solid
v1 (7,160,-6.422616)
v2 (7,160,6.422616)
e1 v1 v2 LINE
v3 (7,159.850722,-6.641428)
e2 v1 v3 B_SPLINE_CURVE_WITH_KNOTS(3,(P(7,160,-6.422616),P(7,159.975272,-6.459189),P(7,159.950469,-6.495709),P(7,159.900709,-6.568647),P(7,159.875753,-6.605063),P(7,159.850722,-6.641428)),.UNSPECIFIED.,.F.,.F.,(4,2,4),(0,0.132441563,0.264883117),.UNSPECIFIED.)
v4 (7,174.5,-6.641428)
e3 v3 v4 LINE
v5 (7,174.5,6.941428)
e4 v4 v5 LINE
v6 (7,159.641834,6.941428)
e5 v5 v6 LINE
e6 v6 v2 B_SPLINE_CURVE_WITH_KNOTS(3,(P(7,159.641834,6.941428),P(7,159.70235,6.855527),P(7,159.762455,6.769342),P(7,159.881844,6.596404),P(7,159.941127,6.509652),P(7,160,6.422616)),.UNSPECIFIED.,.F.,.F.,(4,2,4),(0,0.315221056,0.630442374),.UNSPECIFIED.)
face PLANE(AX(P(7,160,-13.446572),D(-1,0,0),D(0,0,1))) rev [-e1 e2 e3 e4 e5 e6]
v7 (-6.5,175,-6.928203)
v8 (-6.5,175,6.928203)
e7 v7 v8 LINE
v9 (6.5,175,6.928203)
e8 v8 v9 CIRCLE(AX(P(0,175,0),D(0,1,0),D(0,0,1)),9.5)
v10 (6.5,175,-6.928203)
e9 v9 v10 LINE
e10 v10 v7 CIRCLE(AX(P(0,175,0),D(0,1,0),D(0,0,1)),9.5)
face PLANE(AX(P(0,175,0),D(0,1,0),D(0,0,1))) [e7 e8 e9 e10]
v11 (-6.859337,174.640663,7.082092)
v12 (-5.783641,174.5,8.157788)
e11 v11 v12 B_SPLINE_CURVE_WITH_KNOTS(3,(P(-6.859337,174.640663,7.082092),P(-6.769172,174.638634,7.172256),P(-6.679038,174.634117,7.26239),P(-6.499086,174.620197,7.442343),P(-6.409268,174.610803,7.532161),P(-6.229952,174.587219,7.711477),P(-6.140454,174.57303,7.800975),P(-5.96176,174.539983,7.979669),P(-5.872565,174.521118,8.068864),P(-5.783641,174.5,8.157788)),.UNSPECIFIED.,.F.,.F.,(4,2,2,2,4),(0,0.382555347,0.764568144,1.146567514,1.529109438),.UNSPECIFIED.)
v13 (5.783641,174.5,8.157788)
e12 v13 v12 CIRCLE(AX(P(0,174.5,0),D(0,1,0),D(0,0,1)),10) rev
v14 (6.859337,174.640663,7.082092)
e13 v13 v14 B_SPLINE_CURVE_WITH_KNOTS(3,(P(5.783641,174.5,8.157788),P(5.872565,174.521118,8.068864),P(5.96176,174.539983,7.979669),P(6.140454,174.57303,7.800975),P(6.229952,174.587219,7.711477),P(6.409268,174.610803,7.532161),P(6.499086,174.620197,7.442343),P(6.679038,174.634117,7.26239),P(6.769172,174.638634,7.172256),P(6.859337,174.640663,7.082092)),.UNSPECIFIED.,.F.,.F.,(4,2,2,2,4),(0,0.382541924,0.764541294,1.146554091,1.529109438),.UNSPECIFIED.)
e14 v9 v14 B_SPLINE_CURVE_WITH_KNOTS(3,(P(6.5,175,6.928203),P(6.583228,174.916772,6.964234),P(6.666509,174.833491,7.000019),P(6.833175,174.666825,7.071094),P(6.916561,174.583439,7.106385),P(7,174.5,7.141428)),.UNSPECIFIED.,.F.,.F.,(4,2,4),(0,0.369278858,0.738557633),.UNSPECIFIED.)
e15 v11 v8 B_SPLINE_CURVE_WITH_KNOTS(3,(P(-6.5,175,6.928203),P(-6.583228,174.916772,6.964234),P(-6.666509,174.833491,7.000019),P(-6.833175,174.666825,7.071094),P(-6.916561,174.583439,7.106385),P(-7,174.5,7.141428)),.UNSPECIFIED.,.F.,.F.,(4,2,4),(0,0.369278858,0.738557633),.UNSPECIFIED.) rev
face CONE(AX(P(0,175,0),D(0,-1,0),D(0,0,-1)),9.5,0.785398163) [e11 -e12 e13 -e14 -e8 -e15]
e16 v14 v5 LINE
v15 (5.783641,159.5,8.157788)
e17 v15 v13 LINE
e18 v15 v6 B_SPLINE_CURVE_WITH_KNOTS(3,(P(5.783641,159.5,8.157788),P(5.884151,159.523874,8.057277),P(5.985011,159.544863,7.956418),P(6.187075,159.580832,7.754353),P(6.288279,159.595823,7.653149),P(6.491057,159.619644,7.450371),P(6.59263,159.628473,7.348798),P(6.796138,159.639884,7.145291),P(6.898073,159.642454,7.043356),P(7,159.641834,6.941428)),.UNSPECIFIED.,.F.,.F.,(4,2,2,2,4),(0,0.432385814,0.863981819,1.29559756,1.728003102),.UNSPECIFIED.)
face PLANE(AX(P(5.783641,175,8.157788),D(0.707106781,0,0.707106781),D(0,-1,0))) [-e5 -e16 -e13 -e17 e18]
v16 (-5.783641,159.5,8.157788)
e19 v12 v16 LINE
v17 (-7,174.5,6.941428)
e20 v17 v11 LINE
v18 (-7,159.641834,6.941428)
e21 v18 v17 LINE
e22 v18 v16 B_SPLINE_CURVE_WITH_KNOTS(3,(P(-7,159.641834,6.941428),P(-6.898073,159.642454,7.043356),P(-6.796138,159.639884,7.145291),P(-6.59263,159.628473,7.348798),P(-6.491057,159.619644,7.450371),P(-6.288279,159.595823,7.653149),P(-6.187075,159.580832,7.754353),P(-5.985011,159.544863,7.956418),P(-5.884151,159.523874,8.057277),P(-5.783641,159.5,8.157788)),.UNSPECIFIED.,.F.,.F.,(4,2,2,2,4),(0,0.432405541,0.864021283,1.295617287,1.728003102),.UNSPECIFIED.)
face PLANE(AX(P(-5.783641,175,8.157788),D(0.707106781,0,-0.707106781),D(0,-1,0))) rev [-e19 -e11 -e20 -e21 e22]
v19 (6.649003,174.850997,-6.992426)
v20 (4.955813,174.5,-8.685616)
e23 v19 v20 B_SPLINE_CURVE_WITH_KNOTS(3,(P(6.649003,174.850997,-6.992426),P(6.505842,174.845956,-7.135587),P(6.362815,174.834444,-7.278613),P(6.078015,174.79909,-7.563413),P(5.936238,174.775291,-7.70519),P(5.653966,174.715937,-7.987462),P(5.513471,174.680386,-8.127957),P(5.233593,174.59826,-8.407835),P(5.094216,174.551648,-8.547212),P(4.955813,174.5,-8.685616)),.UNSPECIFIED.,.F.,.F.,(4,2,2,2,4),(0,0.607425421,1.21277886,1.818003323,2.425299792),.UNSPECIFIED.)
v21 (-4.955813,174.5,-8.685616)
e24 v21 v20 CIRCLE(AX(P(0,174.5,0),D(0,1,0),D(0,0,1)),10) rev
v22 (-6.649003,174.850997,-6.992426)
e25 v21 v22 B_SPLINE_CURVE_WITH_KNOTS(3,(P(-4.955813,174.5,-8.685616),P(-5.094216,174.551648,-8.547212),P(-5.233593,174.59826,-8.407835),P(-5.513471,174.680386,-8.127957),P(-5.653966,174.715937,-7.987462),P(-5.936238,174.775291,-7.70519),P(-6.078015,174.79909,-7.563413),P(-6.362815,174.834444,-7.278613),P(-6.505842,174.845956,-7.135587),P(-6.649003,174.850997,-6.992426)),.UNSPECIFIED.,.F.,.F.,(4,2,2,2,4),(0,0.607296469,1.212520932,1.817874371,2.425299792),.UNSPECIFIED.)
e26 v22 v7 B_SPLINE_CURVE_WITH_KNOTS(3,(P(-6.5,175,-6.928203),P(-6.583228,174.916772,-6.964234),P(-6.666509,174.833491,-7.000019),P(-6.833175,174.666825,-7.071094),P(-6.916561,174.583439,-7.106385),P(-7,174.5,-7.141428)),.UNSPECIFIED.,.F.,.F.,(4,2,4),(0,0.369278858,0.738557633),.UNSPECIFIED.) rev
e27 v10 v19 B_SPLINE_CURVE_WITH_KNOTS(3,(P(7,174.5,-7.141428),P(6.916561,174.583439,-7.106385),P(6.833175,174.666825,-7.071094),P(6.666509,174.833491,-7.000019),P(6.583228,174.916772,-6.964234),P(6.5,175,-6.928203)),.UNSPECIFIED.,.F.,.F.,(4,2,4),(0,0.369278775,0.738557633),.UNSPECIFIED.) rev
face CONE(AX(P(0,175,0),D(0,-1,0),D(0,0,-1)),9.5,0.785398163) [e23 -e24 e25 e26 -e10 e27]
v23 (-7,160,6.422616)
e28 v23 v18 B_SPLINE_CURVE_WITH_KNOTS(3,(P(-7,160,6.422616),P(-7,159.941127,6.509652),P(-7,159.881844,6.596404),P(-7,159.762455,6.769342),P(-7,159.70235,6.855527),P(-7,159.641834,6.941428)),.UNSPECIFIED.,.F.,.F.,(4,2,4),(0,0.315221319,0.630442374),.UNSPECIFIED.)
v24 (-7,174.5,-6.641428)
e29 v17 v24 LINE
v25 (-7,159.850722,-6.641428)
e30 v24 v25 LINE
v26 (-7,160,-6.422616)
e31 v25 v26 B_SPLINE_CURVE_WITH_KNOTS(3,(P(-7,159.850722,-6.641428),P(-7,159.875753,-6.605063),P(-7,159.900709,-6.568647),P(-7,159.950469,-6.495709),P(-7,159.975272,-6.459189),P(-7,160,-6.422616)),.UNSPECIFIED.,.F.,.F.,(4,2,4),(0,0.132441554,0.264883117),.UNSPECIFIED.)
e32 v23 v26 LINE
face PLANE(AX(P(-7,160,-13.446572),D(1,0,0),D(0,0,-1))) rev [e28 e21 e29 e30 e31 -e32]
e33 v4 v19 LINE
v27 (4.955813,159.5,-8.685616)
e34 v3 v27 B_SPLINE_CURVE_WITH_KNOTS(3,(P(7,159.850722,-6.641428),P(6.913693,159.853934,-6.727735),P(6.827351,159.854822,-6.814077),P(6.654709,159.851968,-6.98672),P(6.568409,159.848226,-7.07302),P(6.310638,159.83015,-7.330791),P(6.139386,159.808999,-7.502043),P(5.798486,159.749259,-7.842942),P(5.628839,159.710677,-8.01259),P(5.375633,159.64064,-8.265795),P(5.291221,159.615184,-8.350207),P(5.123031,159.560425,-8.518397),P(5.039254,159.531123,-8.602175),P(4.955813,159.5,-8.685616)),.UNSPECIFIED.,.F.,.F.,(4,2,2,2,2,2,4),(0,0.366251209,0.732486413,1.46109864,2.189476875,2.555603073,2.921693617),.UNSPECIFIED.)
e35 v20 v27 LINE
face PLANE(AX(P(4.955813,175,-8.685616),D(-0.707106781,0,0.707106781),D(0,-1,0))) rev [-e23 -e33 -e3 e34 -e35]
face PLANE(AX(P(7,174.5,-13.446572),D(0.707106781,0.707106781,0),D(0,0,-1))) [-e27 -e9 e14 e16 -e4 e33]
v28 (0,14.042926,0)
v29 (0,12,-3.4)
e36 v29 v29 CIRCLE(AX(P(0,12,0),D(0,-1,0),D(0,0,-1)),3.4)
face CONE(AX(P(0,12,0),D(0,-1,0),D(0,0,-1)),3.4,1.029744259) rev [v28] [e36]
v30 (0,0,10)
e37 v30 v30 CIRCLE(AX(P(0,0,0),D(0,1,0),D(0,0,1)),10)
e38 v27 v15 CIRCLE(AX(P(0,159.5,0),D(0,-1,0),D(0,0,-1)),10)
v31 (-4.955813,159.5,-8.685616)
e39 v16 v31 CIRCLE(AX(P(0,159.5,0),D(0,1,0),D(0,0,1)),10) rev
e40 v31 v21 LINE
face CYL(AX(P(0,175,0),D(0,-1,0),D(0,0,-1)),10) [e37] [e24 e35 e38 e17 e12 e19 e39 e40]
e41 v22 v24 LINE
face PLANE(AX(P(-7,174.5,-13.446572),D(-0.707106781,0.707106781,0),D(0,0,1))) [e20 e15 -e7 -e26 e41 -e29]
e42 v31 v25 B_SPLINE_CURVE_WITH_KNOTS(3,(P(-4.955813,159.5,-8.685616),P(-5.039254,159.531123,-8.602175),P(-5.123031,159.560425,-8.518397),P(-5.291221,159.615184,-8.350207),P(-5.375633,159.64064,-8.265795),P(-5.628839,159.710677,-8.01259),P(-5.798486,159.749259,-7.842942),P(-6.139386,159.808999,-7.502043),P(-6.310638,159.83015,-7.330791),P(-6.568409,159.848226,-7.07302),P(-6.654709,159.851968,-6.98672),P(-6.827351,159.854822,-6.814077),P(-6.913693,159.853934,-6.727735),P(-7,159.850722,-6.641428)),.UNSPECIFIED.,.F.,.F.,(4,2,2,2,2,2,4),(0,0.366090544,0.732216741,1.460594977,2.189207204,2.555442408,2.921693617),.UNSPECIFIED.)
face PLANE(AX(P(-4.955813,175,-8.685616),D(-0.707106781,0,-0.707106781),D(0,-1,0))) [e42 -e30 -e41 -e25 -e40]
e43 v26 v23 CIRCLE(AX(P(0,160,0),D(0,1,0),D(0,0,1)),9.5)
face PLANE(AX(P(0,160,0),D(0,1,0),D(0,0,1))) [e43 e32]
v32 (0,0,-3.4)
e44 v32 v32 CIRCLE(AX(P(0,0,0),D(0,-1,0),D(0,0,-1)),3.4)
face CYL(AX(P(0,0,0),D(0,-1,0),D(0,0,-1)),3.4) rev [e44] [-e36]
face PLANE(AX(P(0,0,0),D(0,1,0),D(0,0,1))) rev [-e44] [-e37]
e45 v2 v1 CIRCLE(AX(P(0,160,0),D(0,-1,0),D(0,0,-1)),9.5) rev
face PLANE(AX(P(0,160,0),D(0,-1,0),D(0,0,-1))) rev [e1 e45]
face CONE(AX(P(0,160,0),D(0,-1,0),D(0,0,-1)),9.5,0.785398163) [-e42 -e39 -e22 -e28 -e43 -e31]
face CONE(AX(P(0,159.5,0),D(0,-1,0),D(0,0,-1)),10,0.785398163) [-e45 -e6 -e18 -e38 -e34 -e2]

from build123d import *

# Parameters (mm, degrees)
SKETCH_1_R             = 10
EXTRUDE_1_DEPTH        = 175
SKETCH_2_W             = 7.534980856
SKETCH_2_H             = 25.851722938
CUT_EXTRUDE_1_DEPTH    = 15
HOLE_WIZARD_M8_1_D     = 6.8
HOLE_WIZARD_M8_1_DEPTH = 12
HOLE_WIZARD_M8_1_TIP   = 2.042926105
CHAMFER_1_SIZE         = 0.5
CHAMFER_4_SIZE         = 0.2
CHAMFER_5_SIZE         = 0.5
CHAMFER_2_SIZE         = 0.5


with BuildPart() as part:
    # 스케치1 → 보스-돌출1 (new body)
    with BuildSketch(Plane(origin=(0, 0, 0), x_dir=(1, 0, 0), z_dir=(0, 1, 0))):
        with Locations(Location((0, 0, 0), (0, 0, 270))):
            Circle(SKETCH_1_R)
    extrude(amount=EXTRUDE_1_DEPTH)

    # 스케치2 → 컷-돌출1 (cut)
    with BuildSketch(Plane(origin=(0, 175, 0), x_dir=(1, 0, 0), z_dir=(0, 1, 0))):
        with Locations((-10.767490428, 0.520710059)):
            Rectangle(SKETCH_2_W, SKETCH_2_H)
        with Locations((10.767490428, 0.520710059)):
            Rectangle(SKETCH_2_W, SKETCH_2_H)
    extrude(amount=-CUT_EXTRUDE_1_DEPTH, mode=Mode.SUBTRACT)

    # M8 나사 구멍1
    with Locations(Plane(origin=(0, 0, 0), x_dir=(-1, 0, 0), z_dir=(0, -1, 0))):
        with Locations((0, 0)):
            Hole(HOLE_WIZARD_M8_1_D / 2, depth=HOLE_WIZARD_M8_1_DEPTH)
            with Locations((0, 0, -(HOLE_WIZARD_M8_1_DEPTH + HOLE_WIZARD_M8_1_TIP / 2))):  # 118° drill point
                Cone(0, HOLE_WIZARD_M8_1_D / 2, HOLE_WIZARD_M8_1_TIP, mode=Mode.SUBTRACT)

    # 모따기1
    chamfer_1_edges = [part.edges().sort_by_distance(p)[0] for p in [
        (0, 175, -10),
        (3.780589618, 175, 9.257815193),
        (7, 175, 0),
        (-7, 175, 0),
    ]]
    chamfer(chamfer_1_edges, length=CHAMFER_1_SIZE)

    # 모따기4
    # the kernel refuses this chamfer: 14.141428429, 0.2 mm, written as the material it takes off along each edge
    with BuildSketch(Plane(origin=(-7, 179.872714198, 7.141428429), x_dir=(0.7673746516372044, 0, 0.6411989894133326), z_dir=(0, -1, 0))) as chamfer_4_piece_1:
        with BuildLine():
            Line((1.58509174, 0), (-CHAMFER_4_SIZE * 0.641198989413, -CHAMFER_4_SIZE * 0.767374651637))
            Line((-CHAMFER_4_SIZE * 0.641198989413, -CHAMFER_4_SIZE * 0.767374651637), (0, 0))
            ThreePointArc((0, 0), (1.074309981, 0.027485583), (1.58509174, 0))
        make_face()
    extrude(amount=19.872714198, mode=Mode.SUBTRACT)
    with BuildSketch(Plane(origin=(7, 179.872714198, 7.141428429), x_dir=(-0.7673746516372026, 0, 0.6411989894133348), z_dir=(0, -1, 0))) as chamfer_4_piece_2:
        with BuildLine():
            Line((1.58509174, 0), (-CHAMFER_4_SIZE * 0.641198989413, CHAMFER_4_SIZE * 0.767374651637))
            Line((-CHAMFER_4_SIZE * 0.641198989413, CHAMFER_4_SIZE * 0.767374651637), (0, 0))
            ThreePointArc((0, 0), (1.074309981, -0.027485583), (1.58509174, 0))
        make_face()
    extrude(amount=19.872714198, mode=Mode.SUBTRACT)

    # 모따기5
    # the kernel refuses this chamfer: 35.353571071, 0.5 mm, written as the material it takes off along each edge
    with BuildSketch(Plane(origin=(7, 184.418230147, -7.141428429), x_dir=(-0.7979254789483874, 0, -0.6027561115782952), z_dir=(0, -1, 0))) as chamfer_5_piece_1:
        with BuildLine():
            Line((2.561877444, 0), (-CHAMFER_5_SIZE * 0.602756111578, -CHAMFER_5_SIZE * 0.797925478948))
            Line((-CHAMFER_5_SIZE * 0.602756111578, -CHAMFER_5_SIZE * 0.797925478948), (0, 0))
            ThreePointArc((0, 0), (1.978478429, 0.058021773), (2.561877444, 0))
        make_face()
    extrude(amount=24.418230147, mode=Mode.SUBTRACT)
    with BuildSketch(Plane(origin=(-7, 184.418230147, -7.141428429), x_dir=(0.797925478948387, 0, -0.6027561115782961), z_dir=(0, -1, 0))) as chamfer_5_piece_2:
        with BuildLine():
            Line((2.561877444, 0), (-CHAMFER_5_SIZE * 0.602756111578, CHAMFER_5_SIZE * 0.797925478948))
            Line((-CHAMFER_5_SIZE * 0.602756111578, CHAMFER_5_SIZE * 0.797925478948), (0, 0))
            ThreePointArc((0, 0), (1.978478429, -0.058021773), (2.561877444, 0))
        make_face()
    extrude(amount=24.418230147, mode=Mode.SUBTRACT)

    # 모따기2
    # the kernel refuses this chamfer: 0.5 mm, written as the material it takes off along each edge
    with BuildSketch(Plane(origin=(0, 160, 0), x_dir=(-0.6999999999999962, 0, 0.7141428428542888), z_dir=(0.7141428428542888, 0, 0.6999999999999962))) as chamfer_2_piece_1_section:
        Polygon((10, CHAMFER_2_SIZE), (10 - CHAMFER_2_SIZE, 0), (10, 0), align=None)
    chamfer_2_piece_1 = revolve(axis=Axis((0, 160, 0), (0, -1, 0)), revolution_arc=113.236333046, mode=Mode.PRIVATE)
    chamfer_2_piece_1 = split(chamfer_2_piece_1, bisect_by=Plane(origin=(-7, 160, 0), z_dir=(-1, 0, 0)), keep=Keep.TOP, mode=Mode.PRIVATE)
    add(chamfer_2_piece_1, mode=Mode.SUBTRACT)
    with BuildSketch(Plane(origin=(0, 160, 0), x_dir=(-0.6999999999999962, 0, 0.7141428428542888), z_dir=(0.7141428428542888, 0, 0.6999999999999962))) as chamfer_2_piece_2_section:
        Polygon((10, CHAMFER_2_SIZE), (10 - CHAMFER_2_SIZE, 0), (10, 0), align=None)
    chamfer_2_piece_2 = revolve(axis=Axis((0, 160, 0), (0, -1, 0)), revolution_arc=113.236333046, mode=Mode.PRIVATE)
    chamfer_2_piece_2 = split(chamfer_2_piece_2, bisect_by=Plane(origin=(-6.970714214, 160, 6.970714214), z_dir=(-0.7071067811840911, 0, 0.707106781189004)), keep=Keep.TOP, mode=Mode.PRIVATE)
    add(chamfer_2_piece_2, mode=Mode.SUBTRACT)
    with BuildSketch(Plane(origin=(0, 160, 0), x_dir=(-0.6999999999999962, 0, 0.7141428428542888), z_dir=(0.7141428428542888, 0, 0.6999999999999962))) as chamfer_2_piece_3_section:
        Polygon((10, CHAMFER_2_SIZE), (10 - CHAMFER_2_SIZE, 0), (10, 0), align=None)
    chamfer_2_piece_3 = revolve(axis=Axis((0, 160, 0), (0, -1, 0)), revolution_arc=113.236333046, mode=Mode.PRIVATE)
    chamfer_2_piece_3 = split(chamfer_2_piece_3, bisect_by=Plane(origin=(-6.820714214, 160, -6.820714214), z_dir=(-0.707106781186502, 0, -0.707106781186593)), keep=Keep.TOP, mode=Mode.PRIVATE)
    add(chamfer_2_piece_3, mode=Mode.SUBTRACT)
    with BuildSketch(Plane(origin=(0, 160, 0), x_dir=(0.38004811354694096, 0, -0.9249667190712385), z_dir=(-0.9249667190712385, 0, -0.38004811354694096))) as chamfer_2_piece_4_section:
        Polygon((10, CHAMFER_2_SIZE), (10 - CHAMFER_2_SIZE, 0), (10, 0), align=None)
    chamfer_2_piece_4 = revolve(axis=Axis((0, 160, 0), (0, -1, 0)), revolution_arc=113.236333046, mode=Mode.PRIVATE)
    chamfer_2_piece_4 = split(chamfer_2_piece_4, bisect_by=Plane(origin=(7, 160, 0), z_dir=(1, 0, 0)), keep=Keep.TOP, mode=Mode.PRIVATE)
    add(chamfer_2_piece_4, mode=Mode.SUBTRACT)
    with BuildSketch(Plane(origin=(0, 160, 0), x_dir=(0.38004811354694096, 0, -0.9249667190712385), z_dir=(-0.9249667190712385, 0, -0.38004811354694096))) as chamfer_2_piece_5_section:
        Polygon((10, CHAMFER_2_SIZE), (10 - CHAMFER_2_SIZE, 0), (10, 0), align=None)
    chamfer_2_piece_5 = revolve(axis=Axis((0, 160, 0), (0, -1, 0)), revolution_arc=113.236333046, mode=Mode.PRIVATE)
    chamfer_2_piece_5 = split(chamfer_2_piece_5, bisect_by=Plane(origin=(6.820714214, 160, -6.820714214), z_dir=(0.707106781186502, 0, -0.707106781186593)), keep=Keep.TOP, mode=Mode.PRIVATE)
    add(chamfer_2_piece_5, mode=Mode.SUBTRACT)
    with BuildSketch(Plane(origin=(0, 160, 0), x_dir=(0.38004811354694096, 0, -0.9249667190712385), z_dir=(-0.9249667190712385, 0, -0.38004811354694096))) as chamfer_2_piece_6_section:
        Polygon((10, CHAMFER_2_SIZE), (10 - CHAMFER_2_SIZE, 0), (10, 0), align=None)
    chamfer_2_piece_6 = revolve(axis=Axis((0, 160, 0), (0, -1, 0)), revolution_arc=113.236333046, mode=Mode.PRIVATE)
    chamfer_2_piece_6 = split(chamfer_2_piece_6, bisect_by=Plane(origin=(6.970714214, 160, 6.970714214), z_dir=(0.7071067811840911, 0, 0.707106781189004)), keep=Keep.TOP, mode=Mode.PRIVATE)
    add(chamfer_2_piece_6, mode=Mode.SUBTRACT)
    with BuildSketch(Plane(origin=(0, 160, 0), x_dir=(0.6999999999991152, 0, 0.7141428428551523), z_dir=(0.7141428428551523, 0, -0.6999999999991152))) as chamfer_2_piece_7_section:
        Polygon((10, CHAMFER_2_SIZE), (10 - CHAMFER_2_SIZE, 0), (10, 0), align=None)
    chamfer_2_piece_7 = revolve(axis=Axis((0, 160, 0), (0, -1, 0)), revolution_arc=16.458800605, mode=Mode.PRIVATE)
    chamfer_2_piece_7 = split(chamfer_2_piece_7, bisect_by=Plane(origin=(6.970714214, 160, 6.970714214), z_dir=(0.7071067811840911, 0, 0.707106781189004)), keep=Keep.TOP, mode=Mode.PRIVATE)
    add(chamfer_2_piece_7, mode=Mode.SUBTRACT)
    with BuildSketch(Plane(origin=(0, 160, 0), x_dir=(-0.6999999999991152, 0, 0.7141428428551523), z_dir=(-0.7141428428551523, 0, -0.6999999999991152))) as chamfer_2_piece_8_section:
        Polygon((10, -CHAMFER_2_SIZE), (10 - CHAMFER_2_SIZE, 0), (10, 0), align=None)
    chamfer_2_piece_8 = revolve(axis=Axis((0, 160, 0), (0, 1, 0)), revolution_arc=16.458800605, mode=Mode.PRIVATE)
    chamfer_2_piece_8 = split(chamfer_2_piece_8, bisect_by=Plane(origin=(-6.970714214, 160, 6.970714214), z_dir=(-0.7071067811840911, 0, 0.707106781189004)), keep=Keep.TOP, mode=Mode.PRIVATE)
    add(chamfer_2_piece_8, mode=Mode.SUBTRACT)


solid = part.part
